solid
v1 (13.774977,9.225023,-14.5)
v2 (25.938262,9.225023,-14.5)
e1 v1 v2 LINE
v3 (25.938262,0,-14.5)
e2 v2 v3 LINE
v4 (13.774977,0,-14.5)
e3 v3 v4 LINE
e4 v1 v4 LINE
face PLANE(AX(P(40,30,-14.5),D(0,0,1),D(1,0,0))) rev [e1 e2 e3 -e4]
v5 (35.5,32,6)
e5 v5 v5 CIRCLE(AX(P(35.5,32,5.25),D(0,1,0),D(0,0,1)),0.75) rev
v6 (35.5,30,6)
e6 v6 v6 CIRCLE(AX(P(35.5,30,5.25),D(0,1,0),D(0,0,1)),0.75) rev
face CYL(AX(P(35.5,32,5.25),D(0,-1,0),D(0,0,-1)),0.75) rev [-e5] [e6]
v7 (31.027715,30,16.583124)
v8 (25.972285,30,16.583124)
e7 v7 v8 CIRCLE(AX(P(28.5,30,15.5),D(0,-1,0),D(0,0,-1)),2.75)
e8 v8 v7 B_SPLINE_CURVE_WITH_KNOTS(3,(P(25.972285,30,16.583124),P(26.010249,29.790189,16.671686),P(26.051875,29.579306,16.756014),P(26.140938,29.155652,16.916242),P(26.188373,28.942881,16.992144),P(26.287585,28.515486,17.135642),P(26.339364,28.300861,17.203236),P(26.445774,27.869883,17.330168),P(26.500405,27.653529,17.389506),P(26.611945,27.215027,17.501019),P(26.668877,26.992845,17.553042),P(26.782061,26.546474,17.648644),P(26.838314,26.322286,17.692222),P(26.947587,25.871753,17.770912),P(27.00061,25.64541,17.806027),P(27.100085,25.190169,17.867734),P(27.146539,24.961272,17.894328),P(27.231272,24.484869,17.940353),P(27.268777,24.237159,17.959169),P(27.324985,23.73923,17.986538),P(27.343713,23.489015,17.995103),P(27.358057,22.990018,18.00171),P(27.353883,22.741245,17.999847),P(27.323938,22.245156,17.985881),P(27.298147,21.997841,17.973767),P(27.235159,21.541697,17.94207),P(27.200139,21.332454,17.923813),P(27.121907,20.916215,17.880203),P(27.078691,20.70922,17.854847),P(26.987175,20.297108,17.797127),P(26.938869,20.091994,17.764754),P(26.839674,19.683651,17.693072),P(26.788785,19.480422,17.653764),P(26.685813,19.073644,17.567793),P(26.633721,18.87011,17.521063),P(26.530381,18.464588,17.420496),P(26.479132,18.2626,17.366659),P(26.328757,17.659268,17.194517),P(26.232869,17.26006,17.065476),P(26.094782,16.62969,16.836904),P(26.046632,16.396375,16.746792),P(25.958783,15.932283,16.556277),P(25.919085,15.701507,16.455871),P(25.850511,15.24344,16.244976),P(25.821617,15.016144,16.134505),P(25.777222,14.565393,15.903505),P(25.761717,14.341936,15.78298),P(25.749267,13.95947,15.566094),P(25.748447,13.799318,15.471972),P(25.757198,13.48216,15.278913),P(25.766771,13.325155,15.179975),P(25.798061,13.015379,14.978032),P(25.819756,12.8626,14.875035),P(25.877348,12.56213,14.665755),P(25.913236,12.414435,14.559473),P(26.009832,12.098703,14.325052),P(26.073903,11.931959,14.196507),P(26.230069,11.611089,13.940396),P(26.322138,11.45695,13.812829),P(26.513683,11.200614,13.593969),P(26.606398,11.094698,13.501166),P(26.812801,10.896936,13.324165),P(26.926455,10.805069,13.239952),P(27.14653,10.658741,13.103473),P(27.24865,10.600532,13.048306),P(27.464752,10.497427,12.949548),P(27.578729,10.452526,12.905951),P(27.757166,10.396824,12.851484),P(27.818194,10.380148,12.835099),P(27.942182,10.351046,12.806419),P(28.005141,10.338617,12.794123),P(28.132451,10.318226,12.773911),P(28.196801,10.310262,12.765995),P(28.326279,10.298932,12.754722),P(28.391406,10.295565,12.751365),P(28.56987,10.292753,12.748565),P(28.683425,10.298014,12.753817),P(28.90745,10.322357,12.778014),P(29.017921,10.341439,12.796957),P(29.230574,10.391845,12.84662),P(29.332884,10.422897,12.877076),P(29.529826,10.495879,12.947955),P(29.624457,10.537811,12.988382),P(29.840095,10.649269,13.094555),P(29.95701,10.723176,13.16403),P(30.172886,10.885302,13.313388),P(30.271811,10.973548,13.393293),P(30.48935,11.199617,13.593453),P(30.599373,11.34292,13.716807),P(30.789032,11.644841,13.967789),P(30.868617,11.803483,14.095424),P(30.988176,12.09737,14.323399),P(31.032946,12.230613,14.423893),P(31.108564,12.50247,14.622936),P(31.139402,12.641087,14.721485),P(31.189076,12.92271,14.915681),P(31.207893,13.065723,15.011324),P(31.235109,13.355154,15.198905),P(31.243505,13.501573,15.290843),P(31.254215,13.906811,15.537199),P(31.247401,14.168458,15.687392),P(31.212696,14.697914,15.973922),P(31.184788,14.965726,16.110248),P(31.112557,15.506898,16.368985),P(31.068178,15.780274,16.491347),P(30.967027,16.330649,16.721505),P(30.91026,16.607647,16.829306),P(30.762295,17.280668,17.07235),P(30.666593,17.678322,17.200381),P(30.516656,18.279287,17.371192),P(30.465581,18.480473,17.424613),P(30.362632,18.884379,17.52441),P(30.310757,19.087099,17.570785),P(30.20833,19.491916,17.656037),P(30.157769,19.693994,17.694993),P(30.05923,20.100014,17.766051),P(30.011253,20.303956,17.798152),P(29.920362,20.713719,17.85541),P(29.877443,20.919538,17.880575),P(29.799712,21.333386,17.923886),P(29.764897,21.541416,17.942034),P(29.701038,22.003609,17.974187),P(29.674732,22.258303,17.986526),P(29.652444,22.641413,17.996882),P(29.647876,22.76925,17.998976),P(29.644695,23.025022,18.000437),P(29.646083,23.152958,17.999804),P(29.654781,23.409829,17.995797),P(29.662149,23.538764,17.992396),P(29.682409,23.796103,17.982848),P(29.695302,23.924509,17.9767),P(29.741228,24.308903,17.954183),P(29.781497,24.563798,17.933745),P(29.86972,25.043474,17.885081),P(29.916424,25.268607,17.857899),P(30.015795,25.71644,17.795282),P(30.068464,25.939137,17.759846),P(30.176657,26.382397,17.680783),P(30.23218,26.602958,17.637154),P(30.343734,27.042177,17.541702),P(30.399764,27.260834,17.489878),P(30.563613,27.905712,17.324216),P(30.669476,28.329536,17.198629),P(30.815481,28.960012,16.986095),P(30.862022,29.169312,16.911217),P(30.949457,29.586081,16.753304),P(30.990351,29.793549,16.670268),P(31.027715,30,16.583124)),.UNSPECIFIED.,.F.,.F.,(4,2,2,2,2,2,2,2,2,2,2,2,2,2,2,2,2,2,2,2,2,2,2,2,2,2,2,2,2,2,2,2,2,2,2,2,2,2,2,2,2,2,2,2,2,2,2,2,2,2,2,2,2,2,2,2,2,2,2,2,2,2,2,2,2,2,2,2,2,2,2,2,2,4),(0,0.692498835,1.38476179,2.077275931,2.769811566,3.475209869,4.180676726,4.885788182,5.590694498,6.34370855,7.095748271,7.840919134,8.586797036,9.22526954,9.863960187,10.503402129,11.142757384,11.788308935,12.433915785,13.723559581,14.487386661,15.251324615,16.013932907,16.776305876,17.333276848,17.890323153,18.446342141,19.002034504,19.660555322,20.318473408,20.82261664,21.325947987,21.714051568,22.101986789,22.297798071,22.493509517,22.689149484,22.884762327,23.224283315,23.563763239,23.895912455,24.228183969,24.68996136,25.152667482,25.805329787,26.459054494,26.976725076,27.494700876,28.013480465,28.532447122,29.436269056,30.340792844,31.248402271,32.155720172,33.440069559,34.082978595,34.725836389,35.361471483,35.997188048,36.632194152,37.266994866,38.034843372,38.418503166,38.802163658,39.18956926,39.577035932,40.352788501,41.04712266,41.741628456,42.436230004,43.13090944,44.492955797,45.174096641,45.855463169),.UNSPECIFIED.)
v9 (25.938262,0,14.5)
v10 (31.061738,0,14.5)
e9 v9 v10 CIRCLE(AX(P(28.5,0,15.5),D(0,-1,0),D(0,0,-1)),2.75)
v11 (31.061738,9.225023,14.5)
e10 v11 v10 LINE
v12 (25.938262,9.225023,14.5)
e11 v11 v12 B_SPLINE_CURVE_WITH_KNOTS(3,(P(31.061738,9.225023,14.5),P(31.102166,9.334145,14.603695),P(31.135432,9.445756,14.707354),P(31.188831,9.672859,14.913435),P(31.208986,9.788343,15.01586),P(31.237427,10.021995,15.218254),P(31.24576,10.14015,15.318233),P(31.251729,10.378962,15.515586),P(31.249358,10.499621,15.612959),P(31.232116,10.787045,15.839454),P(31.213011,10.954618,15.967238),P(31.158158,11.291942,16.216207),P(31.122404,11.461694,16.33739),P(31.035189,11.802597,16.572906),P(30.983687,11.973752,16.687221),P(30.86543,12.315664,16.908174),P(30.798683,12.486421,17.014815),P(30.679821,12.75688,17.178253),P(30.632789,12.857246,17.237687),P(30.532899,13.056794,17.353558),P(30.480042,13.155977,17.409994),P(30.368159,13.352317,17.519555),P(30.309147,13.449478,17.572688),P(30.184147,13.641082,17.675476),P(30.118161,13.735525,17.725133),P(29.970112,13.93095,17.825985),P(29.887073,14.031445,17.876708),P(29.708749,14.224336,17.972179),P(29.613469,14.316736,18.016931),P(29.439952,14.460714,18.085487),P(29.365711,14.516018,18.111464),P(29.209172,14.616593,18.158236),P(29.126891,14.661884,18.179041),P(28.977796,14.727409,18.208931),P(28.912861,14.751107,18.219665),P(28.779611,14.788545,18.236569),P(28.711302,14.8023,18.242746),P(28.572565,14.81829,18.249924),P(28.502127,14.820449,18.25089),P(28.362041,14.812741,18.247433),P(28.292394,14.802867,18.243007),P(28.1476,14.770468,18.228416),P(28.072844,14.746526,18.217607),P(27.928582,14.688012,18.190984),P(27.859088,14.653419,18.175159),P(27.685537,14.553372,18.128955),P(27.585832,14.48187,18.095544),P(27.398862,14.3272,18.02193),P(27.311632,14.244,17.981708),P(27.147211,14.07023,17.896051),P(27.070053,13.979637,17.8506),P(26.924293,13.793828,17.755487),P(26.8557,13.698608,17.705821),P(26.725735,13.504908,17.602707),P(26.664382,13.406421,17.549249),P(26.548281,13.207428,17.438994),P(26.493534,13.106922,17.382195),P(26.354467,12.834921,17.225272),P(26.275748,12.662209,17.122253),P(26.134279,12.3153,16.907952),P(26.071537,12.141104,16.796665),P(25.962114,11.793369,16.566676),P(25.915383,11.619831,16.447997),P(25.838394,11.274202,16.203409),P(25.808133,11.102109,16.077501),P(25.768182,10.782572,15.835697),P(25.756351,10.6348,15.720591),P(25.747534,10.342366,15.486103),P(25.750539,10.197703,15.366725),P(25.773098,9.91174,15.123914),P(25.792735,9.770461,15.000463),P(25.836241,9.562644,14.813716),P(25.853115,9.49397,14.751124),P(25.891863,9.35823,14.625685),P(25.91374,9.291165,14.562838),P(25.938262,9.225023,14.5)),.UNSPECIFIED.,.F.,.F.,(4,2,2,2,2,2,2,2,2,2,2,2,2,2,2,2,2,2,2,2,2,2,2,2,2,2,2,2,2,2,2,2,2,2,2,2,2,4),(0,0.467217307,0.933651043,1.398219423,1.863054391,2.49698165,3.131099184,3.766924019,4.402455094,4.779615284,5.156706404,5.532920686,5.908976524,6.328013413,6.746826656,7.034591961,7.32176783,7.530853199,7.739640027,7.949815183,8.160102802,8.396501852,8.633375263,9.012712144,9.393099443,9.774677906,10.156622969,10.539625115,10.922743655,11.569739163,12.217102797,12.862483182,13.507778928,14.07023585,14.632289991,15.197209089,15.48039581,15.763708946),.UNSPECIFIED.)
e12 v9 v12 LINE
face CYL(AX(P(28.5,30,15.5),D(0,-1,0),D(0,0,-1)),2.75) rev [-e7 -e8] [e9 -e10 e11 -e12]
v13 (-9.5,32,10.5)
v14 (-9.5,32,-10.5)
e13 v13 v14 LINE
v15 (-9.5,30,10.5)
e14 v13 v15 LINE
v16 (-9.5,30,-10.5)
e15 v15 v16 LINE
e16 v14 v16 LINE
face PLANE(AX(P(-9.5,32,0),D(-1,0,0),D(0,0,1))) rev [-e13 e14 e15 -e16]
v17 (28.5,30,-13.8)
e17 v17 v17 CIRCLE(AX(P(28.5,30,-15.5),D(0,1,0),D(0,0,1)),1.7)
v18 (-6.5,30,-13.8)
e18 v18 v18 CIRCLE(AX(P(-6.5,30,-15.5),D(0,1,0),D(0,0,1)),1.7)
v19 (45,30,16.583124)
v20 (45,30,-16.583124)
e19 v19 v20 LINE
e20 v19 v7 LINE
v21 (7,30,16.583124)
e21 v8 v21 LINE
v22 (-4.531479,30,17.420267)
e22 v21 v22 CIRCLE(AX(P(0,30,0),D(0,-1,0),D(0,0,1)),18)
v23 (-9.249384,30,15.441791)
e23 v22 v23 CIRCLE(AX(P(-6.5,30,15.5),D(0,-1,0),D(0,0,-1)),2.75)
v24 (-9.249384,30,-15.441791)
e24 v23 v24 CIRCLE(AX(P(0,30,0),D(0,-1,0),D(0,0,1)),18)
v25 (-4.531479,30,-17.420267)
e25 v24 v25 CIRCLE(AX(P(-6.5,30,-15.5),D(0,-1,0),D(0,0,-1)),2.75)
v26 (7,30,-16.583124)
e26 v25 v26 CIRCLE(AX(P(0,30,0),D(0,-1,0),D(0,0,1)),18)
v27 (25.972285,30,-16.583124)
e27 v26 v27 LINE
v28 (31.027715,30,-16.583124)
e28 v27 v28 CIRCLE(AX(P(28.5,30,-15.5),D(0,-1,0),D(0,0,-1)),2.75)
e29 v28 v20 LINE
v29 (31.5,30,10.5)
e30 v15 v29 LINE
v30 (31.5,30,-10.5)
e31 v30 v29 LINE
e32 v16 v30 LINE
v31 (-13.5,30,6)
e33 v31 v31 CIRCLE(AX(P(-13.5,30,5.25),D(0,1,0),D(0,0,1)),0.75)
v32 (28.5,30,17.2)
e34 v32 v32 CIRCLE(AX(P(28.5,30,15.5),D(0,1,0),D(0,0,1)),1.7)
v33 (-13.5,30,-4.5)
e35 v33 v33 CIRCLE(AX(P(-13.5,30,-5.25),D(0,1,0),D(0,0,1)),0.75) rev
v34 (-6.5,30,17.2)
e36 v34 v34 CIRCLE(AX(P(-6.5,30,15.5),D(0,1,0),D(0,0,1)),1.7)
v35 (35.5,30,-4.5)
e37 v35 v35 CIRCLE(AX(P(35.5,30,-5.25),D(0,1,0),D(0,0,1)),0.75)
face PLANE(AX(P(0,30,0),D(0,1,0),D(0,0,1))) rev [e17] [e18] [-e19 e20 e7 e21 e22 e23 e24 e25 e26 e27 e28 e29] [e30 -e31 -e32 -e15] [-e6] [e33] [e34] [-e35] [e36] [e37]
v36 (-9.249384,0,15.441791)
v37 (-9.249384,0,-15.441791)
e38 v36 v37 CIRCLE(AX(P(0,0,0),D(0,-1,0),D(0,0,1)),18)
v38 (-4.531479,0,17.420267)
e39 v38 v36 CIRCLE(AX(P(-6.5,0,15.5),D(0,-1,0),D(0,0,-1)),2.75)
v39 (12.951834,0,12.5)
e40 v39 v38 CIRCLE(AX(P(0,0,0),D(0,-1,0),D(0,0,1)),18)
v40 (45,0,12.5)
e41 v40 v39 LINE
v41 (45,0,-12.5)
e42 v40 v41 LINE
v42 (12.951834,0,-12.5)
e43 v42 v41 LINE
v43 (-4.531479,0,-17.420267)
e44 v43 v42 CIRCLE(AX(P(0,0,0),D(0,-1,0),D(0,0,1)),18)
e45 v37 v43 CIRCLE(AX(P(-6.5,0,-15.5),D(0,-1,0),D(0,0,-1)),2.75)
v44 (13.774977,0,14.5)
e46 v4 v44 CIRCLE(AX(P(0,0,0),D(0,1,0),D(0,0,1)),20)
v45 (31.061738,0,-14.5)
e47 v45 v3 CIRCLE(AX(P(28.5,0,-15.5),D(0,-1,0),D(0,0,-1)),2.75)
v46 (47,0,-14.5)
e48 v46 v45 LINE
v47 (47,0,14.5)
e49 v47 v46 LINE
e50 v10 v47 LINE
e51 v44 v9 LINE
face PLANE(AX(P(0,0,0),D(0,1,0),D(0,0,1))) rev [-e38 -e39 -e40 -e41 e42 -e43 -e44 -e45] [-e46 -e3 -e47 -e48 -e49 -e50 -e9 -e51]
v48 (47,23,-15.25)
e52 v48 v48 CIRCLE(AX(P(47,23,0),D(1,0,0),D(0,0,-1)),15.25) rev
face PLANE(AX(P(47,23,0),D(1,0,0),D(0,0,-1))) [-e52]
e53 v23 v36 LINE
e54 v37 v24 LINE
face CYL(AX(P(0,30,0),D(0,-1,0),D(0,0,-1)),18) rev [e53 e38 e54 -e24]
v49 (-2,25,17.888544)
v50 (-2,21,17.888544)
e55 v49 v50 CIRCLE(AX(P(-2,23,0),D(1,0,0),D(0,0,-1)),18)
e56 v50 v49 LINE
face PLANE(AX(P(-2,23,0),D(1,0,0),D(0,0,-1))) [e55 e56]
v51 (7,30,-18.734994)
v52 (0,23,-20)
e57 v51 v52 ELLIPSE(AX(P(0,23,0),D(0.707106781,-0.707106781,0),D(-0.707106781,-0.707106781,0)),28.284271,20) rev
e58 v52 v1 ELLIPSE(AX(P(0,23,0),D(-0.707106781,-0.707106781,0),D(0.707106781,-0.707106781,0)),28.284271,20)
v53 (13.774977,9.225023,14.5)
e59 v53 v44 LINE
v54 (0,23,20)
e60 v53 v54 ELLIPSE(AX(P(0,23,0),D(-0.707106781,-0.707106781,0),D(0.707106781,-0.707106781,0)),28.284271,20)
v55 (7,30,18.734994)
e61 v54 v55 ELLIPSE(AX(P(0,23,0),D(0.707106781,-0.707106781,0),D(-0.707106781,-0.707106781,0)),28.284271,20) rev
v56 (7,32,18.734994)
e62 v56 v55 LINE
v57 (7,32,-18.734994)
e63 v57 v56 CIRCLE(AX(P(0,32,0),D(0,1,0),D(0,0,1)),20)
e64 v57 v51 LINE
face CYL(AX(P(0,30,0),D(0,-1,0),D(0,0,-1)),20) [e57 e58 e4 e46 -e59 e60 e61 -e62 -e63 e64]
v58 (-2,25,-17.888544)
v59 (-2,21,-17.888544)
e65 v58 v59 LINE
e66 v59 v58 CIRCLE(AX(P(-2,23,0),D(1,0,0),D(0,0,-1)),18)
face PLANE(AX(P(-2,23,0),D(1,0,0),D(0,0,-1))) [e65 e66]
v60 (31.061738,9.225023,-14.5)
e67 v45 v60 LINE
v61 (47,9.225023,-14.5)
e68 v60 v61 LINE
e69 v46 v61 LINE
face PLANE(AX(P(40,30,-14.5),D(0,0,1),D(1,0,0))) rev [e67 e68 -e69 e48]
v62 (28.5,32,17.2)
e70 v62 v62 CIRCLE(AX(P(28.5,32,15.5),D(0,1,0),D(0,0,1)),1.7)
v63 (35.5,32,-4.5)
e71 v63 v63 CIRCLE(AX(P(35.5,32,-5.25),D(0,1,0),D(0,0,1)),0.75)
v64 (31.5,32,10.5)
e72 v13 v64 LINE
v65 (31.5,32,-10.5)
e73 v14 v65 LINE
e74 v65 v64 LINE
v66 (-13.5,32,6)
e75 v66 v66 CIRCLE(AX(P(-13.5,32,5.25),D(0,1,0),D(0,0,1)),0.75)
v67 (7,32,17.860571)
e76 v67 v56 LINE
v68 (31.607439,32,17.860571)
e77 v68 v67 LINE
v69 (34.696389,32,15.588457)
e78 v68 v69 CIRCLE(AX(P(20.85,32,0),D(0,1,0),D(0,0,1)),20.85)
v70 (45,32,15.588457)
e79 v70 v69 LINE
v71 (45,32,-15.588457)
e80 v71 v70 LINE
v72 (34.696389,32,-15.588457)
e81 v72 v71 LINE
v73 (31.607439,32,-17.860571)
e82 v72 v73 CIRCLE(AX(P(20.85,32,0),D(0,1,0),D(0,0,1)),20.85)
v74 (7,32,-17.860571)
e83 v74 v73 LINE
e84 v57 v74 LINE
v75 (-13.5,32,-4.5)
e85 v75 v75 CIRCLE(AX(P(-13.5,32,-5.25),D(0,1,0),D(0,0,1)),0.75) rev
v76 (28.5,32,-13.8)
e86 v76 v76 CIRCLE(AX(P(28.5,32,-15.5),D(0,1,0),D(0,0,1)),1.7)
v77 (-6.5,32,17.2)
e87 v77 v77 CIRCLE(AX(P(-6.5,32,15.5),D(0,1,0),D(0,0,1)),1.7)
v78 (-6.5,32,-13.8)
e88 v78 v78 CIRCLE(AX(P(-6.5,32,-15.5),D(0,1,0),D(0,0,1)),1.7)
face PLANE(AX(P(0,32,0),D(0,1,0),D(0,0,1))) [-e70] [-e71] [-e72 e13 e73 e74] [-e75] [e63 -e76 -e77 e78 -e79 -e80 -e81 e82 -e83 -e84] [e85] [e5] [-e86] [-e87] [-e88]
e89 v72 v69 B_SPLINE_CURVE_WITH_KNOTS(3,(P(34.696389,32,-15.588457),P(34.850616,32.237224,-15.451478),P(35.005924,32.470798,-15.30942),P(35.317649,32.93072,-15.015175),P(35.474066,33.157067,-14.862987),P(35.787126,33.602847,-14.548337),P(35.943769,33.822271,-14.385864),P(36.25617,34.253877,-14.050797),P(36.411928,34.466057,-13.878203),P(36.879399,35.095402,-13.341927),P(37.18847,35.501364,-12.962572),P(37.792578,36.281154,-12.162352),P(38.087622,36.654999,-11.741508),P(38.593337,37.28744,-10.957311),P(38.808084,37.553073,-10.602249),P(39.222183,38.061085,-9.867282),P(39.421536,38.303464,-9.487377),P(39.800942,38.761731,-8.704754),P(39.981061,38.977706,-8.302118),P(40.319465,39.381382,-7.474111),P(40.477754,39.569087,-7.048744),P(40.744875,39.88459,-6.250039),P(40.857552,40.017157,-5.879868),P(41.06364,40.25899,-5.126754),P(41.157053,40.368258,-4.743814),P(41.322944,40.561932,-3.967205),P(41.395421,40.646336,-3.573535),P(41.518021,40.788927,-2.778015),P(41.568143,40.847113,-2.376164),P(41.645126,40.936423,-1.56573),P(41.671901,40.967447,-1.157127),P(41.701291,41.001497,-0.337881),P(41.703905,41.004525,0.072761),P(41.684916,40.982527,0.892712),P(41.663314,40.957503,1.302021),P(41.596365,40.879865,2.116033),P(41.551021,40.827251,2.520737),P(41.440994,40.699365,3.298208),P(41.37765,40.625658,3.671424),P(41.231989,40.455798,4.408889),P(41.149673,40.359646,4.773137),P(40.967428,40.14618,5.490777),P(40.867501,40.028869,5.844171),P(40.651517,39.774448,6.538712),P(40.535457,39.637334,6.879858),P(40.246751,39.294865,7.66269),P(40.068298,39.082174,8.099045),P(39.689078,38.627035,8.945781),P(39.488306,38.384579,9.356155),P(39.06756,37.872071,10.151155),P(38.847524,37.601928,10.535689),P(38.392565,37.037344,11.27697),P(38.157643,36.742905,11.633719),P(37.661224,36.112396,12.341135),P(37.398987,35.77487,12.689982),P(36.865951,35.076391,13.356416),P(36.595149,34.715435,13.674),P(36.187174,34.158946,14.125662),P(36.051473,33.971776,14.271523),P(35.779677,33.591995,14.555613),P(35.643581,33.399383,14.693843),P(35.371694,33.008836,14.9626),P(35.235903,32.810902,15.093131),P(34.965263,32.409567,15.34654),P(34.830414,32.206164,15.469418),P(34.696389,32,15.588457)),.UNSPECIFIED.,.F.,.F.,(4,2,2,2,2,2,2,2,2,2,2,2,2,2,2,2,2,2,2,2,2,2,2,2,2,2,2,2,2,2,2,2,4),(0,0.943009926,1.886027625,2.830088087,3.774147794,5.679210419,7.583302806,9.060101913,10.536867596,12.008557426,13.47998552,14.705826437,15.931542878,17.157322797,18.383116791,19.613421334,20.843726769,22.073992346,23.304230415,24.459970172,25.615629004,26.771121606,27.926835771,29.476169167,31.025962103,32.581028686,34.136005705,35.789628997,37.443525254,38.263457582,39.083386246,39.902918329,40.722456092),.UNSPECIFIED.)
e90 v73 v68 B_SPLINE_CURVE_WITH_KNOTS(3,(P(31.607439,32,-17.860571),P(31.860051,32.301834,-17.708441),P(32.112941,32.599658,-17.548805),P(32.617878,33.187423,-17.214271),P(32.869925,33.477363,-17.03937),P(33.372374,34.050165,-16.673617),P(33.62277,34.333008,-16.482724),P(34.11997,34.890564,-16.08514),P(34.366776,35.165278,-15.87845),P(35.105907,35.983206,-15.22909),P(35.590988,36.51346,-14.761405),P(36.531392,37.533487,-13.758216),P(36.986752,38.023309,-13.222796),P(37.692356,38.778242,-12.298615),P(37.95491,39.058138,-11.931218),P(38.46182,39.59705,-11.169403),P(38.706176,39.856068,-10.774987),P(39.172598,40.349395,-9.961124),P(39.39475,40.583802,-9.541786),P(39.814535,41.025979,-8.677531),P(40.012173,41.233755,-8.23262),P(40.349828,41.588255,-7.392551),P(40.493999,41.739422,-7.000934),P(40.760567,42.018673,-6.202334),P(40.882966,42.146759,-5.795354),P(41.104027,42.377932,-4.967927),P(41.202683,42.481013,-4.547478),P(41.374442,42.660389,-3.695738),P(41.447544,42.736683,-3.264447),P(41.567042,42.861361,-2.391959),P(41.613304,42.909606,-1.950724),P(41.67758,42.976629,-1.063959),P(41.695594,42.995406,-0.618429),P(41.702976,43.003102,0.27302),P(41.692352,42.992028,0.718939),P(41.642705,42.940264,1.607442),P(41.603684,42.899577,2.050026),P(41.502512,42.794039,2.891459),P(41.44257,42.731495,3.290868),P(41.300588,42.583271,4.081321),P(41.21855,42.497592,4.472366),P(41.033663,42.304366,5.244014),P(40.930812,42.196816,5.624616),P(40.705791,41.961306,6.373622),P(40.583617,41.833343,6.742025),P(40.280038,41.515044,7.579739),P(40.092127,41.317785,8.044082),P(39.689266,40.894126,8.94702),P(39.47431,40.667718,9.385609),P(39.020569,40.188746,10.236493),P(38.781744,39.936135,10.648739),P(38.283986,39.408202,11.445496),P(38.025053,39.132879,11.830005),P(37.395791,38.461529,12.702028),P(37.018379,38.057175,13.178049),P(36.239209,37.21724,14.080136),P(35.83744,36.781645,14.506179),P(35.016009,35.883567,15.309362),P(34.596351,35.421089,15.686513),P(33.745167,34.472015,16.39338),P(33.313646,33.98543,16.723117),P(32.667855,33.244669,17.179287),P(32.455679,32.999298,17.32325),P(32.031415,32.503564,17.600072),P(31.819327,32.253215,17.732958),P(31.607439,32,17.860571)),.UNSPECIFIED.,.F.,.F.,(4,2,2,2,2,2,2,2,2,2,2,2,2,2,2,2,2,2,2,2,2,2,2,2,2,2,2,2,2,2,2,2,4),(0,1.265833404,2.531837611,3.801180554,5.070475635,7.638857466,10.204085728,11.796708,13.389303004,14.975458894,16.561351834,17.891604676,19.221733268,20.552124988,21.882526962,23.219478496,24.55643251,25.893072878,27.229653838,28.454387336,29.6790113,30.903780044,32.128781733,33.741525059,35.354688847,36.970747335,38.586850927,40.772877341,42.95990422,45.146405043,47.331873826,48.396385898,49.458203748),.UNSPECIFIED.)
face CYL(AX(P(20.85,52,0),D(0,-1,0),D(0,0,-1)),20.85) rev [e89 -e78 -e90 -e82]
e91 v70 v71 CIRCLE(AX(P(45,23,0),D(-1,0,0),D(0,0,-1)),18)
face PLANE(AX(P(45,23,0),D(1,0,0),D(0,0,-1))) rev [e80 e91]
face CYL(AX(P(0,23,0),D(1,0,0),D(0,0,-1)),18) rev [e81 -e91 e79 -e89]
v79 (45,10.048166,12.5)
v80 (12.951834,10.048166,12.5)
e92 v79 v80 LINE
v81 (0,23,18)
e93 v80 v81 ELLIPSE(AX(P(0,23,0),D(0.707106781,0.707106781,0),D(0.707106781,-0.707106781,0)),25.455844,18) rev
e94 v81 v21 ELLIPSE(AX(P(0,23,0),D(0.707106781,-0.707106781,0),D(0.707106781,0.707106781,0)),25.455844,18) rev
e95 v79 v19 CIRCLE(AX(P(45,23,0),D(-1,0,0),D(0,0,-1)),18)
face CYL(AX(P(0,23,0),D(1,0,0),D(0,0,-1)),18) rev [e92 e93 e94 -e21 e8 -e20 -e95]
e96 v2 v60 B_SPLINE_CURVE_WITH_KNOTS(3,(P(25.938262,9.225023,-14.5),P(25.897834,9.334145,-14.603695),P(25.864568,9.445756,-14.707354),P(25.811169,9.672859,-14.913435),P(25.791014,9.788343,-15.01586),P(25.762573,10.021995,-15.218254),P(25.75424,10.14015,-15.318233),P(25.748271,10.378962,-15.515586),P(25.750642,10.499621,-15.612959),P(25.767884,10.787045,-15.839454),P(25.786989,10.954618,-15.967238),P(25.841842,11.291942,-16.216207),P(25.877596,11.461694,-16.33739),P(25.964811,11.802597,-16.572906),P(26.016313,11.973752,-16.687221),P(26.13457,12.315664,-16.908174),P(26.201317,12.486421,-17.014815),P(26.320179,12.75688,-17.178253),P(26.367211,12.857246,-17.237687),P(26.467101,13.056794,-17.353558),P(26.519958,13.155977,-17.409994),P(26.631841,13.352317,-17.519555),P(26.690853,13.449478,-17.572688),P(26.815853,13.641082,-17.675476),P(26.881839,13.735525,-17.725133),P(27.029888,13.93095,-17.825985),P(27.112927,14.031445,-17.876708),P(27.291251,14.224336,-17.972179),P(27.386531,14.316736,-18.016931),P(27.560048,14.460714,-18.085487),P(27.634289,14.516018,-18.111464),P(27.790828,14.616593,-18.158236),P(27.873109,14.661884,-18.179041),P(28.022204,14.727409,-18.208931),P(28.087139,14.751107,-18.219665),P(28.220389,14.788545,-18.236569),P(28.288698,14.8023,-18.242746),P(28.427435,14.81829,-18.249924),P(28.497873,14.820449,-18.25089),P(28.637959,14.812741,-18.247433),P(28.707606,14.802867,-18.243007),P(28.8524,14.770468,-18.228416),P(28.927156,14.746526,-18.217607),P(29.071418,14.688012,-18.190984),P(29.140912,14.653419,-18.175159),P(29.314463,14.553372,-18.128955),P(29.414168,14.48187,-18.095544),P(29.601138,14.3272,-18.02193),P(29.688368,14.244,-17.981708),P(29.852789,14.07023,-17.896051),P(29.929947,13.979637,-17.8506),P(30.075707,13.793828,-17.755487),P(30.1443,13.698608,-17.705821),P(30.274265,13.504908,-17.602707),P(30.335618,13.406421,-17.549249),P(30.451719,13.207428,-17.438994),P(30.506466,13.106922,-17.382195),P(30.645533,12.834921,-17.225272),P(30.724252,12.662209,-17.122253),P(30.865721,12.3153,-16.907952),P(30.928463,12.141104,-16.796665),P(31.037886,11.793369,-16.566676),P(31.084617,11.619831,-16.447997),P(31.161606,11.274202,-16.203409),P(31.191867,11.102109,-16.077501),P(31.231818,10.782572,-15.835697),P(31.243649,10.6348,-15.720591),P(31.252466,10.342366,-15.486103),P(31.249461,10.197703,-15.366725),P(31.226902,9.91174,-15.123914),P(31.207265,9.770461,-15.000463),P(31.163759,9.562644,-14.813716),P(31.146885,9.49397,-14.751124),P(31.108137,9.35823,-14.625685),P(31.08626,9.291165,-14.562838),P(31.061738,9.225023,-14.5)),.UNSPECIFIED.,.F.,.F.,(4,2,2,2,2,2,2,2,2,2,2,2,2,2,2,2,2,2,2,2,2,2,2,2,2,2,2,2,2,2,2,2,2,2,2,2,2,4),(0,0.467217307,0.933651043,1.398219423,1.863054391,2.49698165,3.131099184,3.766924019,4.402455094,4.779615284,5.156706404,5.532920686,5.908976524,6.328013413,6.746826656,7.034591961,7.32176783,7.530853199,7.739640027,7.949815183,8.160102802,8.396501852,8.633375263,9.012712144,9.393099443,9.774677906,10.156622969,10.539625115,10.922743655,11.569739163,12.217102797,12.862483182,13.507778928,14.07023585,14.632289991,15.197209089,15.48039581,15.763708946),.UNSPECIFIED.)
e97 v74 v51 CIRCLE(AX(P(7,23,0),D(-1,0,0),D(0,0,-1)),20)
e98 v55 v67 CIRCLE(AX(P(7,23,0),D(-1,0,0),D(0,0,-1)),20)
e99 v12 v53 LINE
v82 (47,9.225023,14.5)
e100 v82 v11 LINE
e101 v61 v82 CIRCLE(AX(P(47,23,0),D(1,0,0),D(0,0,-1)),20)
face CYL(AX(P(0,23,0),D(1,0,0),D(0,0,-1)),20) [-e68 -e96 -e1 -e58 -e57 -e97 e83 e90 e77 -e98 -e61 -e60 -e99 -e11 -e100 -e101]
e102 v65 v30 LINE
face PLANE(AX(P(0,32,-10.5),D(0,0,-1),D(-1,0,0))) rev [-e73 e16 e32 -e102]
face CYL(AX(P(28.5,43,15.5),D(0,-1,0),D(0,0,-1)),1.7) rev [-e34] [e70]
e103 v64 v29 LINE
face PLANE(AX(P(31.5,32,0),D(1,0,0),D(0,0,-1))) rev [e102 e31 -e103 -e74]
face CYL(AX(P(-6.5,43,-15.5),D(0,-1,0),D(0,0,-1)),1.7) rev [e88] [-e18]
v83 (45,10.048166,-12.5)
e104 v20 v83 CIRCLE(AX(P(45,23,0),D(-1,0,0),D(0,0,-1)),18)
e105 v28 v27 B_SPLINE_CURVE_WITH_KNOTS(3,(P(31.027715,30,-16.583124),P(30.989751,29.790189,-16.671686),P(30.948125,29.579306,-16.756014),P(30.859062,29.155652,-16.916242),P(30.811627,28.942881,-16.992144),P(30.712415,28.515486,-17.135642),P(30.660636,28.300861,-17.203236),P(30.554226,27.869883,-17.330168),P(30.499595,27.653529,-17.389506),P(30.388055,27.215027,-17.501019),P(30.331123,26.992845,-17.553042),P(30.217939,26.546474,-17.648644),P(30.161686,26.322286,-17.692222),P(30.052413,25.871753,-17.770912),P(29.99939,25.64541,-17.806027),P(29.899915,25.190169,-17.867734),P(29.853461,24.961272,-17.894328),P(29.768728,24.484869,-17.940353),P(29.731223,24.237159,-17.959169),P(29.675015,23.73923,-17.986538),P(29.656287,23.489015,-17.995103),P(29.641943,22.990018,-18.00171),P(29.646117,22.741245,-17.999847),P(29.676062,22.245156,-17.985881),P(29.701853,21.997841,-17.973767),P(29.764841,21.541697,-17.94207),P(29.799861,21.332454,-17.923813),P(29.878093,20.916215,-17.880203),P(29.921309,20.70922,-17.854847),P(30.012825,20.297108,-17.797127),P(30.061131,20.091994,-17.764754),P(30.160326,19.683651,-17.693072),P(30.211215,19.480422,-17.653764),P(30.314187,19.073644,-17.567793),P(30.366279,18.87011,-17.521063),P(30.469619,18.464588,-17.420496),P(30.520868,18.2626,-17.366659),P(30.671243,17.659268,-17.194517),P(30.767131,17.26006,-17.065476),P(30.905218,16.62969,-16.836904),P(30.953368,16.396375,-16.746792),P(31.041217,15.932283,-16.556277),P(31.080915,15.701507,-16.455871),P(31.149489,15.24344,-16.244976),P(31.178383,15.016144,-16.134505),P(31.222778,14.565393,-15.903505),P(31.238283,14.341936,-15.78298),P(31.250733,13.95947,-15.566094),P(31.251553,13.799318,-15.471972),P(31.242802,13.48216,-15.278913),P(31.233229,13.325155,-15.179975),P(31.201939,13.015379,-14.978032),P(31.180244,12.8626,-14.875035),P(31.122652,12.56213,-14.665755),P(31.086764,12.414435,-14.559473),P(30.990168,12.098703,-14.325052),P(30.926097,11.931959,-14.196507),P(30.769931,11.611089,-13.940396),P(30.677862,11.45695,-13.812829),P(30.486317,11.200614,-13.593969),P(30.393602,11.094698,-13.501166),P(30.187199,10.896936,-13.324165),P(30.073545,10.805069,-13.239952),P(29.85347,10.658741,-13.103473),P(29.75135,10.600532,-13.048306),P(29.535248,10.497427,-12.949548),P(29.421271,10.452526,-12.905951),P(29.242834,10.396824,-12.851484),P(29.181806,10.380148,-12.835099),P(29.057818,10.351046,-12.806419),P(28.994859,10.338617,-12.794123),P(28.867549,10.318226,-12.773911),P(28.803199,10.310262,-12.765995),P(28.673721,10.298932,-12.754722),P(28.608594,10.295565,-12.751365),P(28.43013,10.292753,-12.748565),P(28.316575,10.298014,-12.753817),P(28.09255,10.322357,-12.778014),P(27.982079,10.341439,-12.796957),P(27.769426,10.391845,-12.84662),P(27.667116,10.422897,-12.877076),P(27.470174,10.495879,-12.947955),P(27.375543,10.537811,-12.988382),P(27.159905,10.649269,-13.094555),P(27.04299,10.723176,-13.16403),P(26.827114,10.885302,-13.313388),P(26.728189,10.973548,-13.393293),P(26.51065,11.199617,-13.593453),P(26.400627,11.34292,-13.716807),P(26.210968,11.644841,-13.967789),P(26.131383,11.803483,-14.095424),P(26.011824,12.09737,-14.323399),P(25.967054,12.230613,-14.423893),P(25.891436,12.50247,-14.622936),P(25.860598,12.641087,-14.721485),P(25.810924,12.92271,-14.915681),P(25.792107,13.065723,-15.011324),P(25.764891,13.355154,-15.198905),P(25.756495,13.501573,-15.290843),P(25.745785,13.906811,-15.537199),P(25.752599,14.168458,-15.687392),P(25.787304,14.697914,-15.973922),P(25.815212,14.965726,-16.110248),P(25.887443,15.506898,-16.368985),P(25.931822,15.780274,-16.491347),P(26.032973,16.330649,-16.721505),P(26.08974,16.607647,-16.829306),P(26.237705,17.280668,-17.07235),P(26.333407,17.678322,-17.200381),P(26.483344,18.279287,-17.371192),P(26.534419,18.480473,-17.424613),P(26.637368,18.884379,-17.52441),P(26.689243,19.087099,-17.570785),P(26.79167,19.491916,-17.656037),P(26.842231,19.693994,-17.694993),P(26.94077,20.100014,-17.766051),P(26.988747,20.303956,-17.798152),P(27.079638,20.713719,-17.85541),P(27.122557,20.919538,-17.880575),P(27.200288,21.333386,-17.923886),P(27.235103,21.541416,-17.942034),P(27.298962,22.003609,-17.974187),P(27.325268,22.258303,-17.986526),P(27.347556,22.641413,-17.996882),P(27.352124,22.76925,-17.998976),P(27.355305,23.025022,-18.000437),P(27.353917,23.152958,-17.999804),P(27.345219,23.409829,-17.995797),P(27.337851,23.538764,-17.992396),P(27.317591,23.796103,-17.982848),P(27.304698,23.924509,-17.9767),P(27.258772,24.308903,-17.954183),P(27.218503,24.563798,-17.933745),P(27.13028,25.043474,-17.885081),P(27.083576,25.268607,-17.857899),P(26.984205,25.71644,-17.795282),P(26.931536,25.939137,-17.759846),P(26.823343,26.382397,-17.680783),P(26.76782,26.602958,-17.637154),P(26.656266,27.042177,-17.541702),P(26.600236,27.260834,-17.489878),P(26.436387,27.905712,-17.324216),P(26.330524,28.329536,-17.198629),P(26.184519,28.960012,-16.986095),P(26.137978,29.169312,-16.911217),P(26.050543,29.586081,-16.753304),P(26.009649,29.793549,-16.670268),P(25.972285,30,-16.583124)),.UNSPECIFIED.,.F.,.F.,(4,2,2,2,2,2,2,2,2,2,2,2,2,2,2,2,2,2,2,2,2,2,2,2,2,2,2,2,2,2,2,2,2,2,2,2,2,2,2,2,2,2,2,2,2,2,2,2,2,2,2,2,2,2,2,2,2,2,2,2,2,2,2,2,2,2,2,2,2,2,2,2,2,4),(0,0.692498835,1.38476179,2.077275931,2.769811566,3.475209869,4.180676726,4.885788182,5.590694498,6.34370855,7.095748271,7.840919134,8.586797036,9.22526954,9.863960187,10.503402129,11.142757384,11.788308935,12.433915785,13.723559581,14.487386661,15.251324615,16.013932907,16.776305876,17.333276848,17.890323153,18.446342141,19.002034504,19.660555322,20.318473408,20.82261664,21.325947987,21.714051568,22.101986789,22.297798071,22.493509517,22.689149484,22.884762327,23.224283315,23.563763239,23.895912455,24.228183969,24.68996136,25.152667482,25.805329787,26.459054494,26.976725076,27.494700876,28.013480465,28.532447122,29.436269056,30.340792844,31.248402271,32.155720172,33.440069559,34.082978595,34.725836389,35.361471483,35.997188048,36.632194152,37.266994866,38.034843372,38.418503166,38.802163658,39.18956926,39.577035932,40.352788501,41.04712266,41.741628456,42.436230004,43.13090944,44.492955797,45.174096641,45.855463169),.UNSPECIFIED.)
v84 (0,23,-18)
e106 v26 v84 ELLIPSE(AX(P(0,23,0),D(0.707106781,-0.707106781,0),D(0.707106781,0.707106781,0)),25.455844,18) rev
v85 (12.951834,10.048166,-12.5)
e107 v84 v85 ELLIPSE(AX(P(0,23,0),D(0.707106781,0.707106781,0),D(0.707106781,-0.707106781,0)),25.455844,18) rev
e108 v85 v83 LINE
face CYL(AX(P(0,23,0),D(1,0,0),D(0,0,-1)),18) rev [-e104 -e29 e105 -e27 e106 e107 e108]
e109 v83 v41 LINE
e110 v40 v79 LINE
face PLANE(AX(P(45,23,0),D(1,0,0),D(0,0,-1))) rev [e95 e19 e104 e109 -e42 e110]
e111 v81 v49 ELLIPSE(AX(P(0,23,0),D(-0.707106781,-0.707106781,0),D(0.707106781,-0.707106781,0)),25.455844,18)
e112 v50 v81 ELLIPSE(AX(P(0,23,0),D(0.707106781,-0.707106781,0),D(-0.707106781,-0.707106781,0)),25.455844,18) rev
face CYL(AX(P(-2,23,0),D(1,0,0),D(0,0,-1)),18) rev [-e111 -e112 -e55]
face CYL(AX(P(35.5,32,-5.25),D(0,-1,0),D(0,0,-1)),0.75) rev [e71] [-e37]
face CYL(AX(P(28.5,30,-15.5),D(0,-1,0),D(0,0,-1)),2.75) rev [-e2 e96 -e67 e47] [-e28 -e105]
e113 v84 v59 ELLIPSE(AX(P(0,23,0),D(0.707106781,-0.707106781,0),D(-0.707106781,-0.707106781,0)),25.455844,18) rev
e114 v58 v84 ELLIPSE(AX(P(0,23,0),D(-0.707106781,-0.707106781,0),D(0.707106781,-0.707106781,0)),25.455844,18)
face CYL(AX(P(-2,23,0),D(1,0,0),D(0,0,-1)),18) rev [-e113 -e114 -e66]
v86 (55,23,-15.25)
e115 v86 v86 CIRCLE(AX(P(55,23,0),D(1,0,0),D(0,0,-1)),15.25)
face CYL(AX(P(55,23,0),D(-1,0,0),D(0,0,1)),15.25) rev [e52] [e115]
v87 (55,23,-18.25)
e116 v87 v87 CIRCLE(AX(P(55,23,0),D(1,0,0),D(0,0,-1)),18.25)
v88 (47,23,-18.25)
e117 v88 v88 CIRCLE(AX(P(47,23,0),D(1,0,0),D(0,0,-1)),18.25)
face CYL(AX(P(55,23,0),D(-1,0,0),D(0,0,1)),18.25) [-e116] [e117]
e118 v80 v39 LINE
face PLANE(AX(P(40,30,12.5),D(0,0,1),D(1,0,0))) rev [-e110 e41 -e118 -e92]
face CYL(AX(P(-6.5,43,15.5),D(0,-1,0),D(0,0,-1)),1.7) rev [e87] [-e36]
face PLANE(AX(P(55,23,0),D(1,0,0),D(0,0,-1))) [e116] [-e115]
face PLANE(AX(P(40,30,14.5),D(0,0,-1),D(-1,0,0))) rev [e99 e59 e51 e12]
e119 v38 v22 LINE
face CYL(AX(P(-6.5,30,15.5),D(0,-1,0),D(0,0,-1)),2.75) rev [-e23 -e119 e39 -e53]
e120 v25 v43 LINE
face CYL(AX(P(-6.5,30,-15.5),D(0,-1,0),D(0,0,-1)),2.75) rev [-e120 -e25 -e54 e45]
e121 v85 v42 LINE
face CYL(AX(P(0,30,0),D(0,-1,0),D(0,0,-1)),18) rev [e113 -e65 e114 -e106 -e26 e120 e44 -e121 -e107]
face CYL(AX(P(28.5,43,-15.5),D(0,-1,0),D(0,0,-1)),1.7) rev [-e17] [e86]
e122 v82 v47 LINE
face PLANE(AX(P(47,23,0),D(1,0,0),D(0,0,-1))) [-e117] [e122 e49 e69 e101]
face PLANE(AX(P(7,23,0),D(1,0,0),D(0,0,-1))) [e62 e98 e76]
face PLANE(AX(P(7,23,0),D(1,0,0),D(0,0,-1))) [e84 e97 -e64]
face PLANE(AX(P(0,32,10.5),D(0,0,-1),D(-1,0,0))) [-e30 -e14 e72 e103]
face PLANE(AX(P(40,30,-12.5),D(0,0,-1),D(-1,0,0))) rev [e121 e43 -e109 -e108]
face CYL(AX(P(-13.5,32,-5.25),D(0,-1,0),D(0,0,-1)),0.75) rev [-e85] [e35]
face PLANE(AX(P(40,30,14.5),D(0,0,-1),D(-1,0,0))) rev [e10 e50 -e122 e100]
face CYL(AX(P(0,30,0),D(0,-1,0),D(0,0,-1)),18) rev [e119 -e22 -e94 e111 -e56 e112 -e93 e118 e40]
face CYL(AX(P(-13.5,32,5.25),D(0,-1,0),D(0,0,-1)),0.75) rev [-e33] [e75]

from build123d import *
from build123d.topology import SkipClean

# Parameters (mm, degrees)
EXTRUDE_1_DEPTH      = 30
EXTRUDE_START        = -40
EXTRUDE_5_DEPTH      = 40
CUT_EXTRUDE_START    = -42
SKETCH_11_R          = 18
CUT_EXTRUDE_2_DEPTH  = 42
CUT_EXTRUDE_3_DEPTH  = 20
CUT_EXTRUDE_6_DEPTH  = 30
EXTRUDE_7_DEPTH      = 5
EXTRUDE_7_DEPTH_BACK = 10
SKETCH_14_R          = 0.75
SKETCH_14_W          = 41
SKETCH_14_H          = 21
EXTRUDE_9_DEPTH      = 2
SKETCH_18_R          = 20.85
CUT_EXTRUDE_8_DEPTH  = 20
CUT_EXTRUDE_START_2  = -38
CUT_EXTRUDE_10_DEPTH = 38
EXTRUDE_10_DEPTH     = 5
EXTRUDE_11_DEPTH     = 2
SKETCH_22_R          = 18.25
SKETCH_22_R_2        = 15.25
EXTRUDE_13_DEPTH     = 8
SKETCH_29_R          = 1.7
CUT_EXTRUDE_13_DEPTH = 73.622310708
SKETCH_30_R          = 2.75
CUT_EXTRUDE_14_DEPTH = 30


# Read off the part's stored shape, not the designer's step: 凸台-拉伸5
with BuildPart() as part:
    # 草图1 → 凸台-拉伸1 (new body)
    with BuildSketch(Plane(origin=(0, 0, 0), x_dir=(1, 0, 0), z_dir=(0, 1, 0))):
        with BuildLine():
            Line((40, 12.5), (12.951833847, 12.5))
            ThreePointArc((12.951833847, 12.5), (-18, 0), (12.951833847, -12.5))
            Line((12.951833847, -12.5), (40, -12.5))
            Line((40, -12.5), (40, -14.5))
            Line((40, -14.5), (13.774977314, -14.5))
            ThreePointArc((13.774977314, -14.5), (-20, 0), (13.774977314, 14.5))
            Line((13.774977314, 14.5), (40, 14.5))
            Line((40, 14.5), (40, 12.5))
        make_face()
    extrude(amount=EXTRUDE_1_DEPTH)

    # 凸台-拉伸5 outline → 凸台-拉伸5 (add)
    with BuildSketch(Plane(origin=(40, 0, 0), x_dir=(0, 0, -1), z_dir=(1, 0, 0)).offset(EXTRUDE_START)):
        with BuildLine():
            ThreePointArc((14.5, 9.225022686), (0, 43), (-14.5, 9.225022686))
            ThreePointArc((-14.5, 9.225022686), (0, 3), (14.5, 9.225022686))
        make_face()
        with BuildLine():
            ThreePointArc((14.5, 12.334635496), (0, 5), (-14.5, 12.334635496))
            ThreePointArc((-14.5, 12.334635496), (0, 41), (14.5, 12.334635496))
        make_face(mode=Mode.SUBTRACT)
    extrude(amount=EXTRUDE_5_DEPTH)

    # 草图11 → 切除-拉伸2 (cut)
    with BuildSketch(Plane(origin=(40, 0, 0), x_dir=(0, 0, -1), z_dir=(1, 0, 0)).offset(CUT_EXTRUDE_START)):
        with Locations((0, 23)):
            Circle(SKETCH_11_R)
    extrude(amount=CUT_EXTRUDE_2_DEPTH, mode=Mode.SUBTRACT)

    # 草图10 → 切除-拉伸3 (cut)
    with BuildSketch(Plane(origin=(0, 30, 0), x_dir=(1, 0, 0), z_dir=(0, 1, 0))):
        with BuildLine():
            Line((0, 20), (40, 20))
            Line((40, 20), (40, -20))
            Line((40, -20), (0, -20))
            ThreePointArc((0, -20), (-20, 0), (0, 20))
        make_face()
    extrude(amount=CUT_EXTRUDE_3_DEPTH, mode=Mode.SUBTRACT)

    # 草图13 → 切除-拉伸6 (cut)
    with SkipClean():  # the faces are left unmerged after this step: merging them gives an invalid solid
        with BuildSketch(Plane.XZ):
            with BuildLine():
                Line((40, -12.5), (12.951833847, -12.5))
                ThreePointArc((12.951833847, -12.5), (-18, 0), (12.951833847, 12.5))
                Line((12.951833847, 12.5), (40, 12.5))
                Line((40, 12.5), (40, -12.5))
            make_face()
        extrude(amount=-CUT_EXTRUDE_6_DEPTH, mode=Mode.SUBTRACT)

    # 草图15 → 凸台-拉伸7 (add, two sides: drawn at the far end of the back side and taken through both)
    with SkipClean():  # the faces are left unmerged after this step: merging them gives an invalid solid
        with BuildSketch(Plane(origin=(40, 0, 0), x_dir=(0, 0, -1), z_dir=(1, 0, 0)).offset(-EXTRUDE_7_DEPTH_BACK)):
            with BuildLine():
                Line((12.5, 10.048166153), (12.5, 7.387505004))
                ThreePointArc((12.5, 7.387505004), (0, 43), (-12.5, 7.387505004))
                Line((-12.5, 7.387505004), (-12.5, 10.048166153))
                ThreePointArc((-12.5, 10.048166153), (0, 41), (12.5, 10.048166153))
            make_face()
        extrude(amount=EXTRUDE_7_DEPTH + EXTRUDE_7_DEPTH_BACK)

    # 草图14 → 凸台-拉伸9 (add)
    # profile 1 of 2: a face of its own
    with SkipClean():  # the faces are left unmerged after this step: merging them gives an invalid solid
        with BuildSketch(Plane(origin=(0, 30, 0), x_dir=(1, 0, 0), z_dir=(0, 1, 0))):
            with BuildLine():
                Line((7, -18.734993995), (30, -18.734993995))
                Line((30, -18.734993995), (30, -16.583123952))
                Line((30, -16.583123952), (7, -16.583123952))
                ThreePointArc((7, -16.583123952), (-18, 0), (7, 16.583123952))
                Line((7, 16.583123952), (30, 16.583123952))
                Line((30, 16.583123952), (30, 18.734993995))
                Line((30, 18.734993995), (7, 18.734993995))
                ThreePointArc((7, 18.734993995), (-20, 0), (7, -18.734993995))
            make_face()
        # profile 2 of 2: a face of its own
        with BuildSketch(Plane(origin=(0, 30, 0), x_dir=(1, 0, 0), z_dir=(0, 1, 0))):
            with BuildLine():
                Line((40, 16.583123952), (40, -16.583123952))
                Line((40, -16.583123952), (7, -16.583123952))
                ThreePointArc((7, -16.583123952), (-18, 0), (7, 16.583123952))
                Line((7, 16.583123952), (40, 16.583123952))
            make_face()
            with Locations(Location((-13.5, 5.25, 0), (0, 0, 270))):
                Circle(SKETCH_14_R, mode=Mode.SUBTRACT)
            with Locations(Location((-13.5, -5.25, 0), (0, 0, 270))):
                Circle(SKETCH_14_R, mode=Mode.SUBTRACT)
            with Locations(Location((35.5, 5.25, 0), (0, 0, 270))):
                Circle(SKETCH_14_R, mode=Mode.SUBTRACT)
            with Locations(Location((35.5, -5.25, 0), (0, 0, 270))):
                Circle(SKETCH_14_R, mode=Mode.SUBTRACT)
            with Locations((11, 0)):
                Rectangle(SKETCH_14_W, SKETCH_14_H, mode=Mode.SUBTRACT)
        extrude(amount=EXTRUDE_9_DEPTH)

    # 草图18 → 切除-拉伸8 (cut)
    with SkipClean():  # the faces are left unmerged after this step: merging them gives an invalid solid
        with BuildSketch(Plane(origin=(0, 32, 0), x_dir=(1, 0, 0), z_dir=(0, 1, 0))):
            with Locations((20.85, 0)):
                Circle(SKETCH_18_R)
        extrude(amount=CUT_EXTRUDE_8_DEPTH, mode=Mode.SUBTRACT)

    # 草图19 → 切除-拉伸10 (cut)
    with SkipClean():  # the faces are left unmerged after this step: merging them gives an invalid solid
        with BuildSketch(Plane(origin=(45, 0, 0), x_dir=(0, 0, -1), z_dir=(1, 0, 0)).offset(CUT_EXTRUDE_START_2)):
            with BuildLine():
                Line((-17.860571099, 32), (-18.734993995, 32))
                Line((-18.734993995, 32), (-18.734993995, 30))
                ThreePointArc((-18.734993995, 30), (-18.325087889, 31.011938208), (-17.860571099, 32))
            make_face()
            with BuildLine():
                Line((18.734993995, 32), (17.860571099, 32))
                ThreePointArc((17.860571099, 32), (18.325087889, 31.011938208), (18.734993995, 30))
                Line((18.734993995, 30), (18.734993995, 32))
            make_face()
        extrude(amount=CUT_EXTRUDE_10_DEPTH, mode=Mode.SUBTRACT)

    # 草图20 → 凸台-拉伸10 (add)
    with SkipClean():  # the faces are left unmerged after this step: merging them gives an invalid solid
        with BuildSketch(Plane(origin=(40, 0, 0), x_dir=(0, 0, -1), z_dir=(1, 0, 0))):
            with BuildLine():
                Line((-14.5, 9.225022686), (-14.5, 0))
                Line((-14.5, 0), (-12.5, 0))
                Line((-12.5, 0), (-12.5, 7.387505004))
                ThreePointArc((-12.5, 7.387505004), (-13.531227506, 8.27227505), (-14.5, 9.225022686))
            make_face()
            with BuildLine():
                Line((12.5, 7.387505004), (12.5, 0))
                Line((12.5, 0), (14.5, 0))
                Line((14.5, 0), (14.5, 9.225022686))
                ThreePointArc((14.5, 9.225022686), (13.531227506, 8.27227505), (12.5, 7.387505004))
            make_face()
            with BuildLine():
                Line((-16.583123952, 30), (16.583123952, 30))
                ThreePointArc((16.583123952, 30), (16.11684397, 31.015443871), (15.588457268, 32))
                Line((15.588457268, 32), (-15.588457268, 32))
                ThreePointArc((-15.588457268, 32), (-16.11684397, 31.015443871), (-16.583123952, 30))
            make_face()
        extrude(amount=EXTRUDE_10_DEPTH)

    # 草图21 → 凸台-拉伸11 (add)
    with SkipClean():  # the faces are left unmerged after this step: merging them gives an invalid solid
        with BuildSketch(Plane(origin=(45, 0, 0), x_dir=(0, 0, -1), z_dir=(1, 0, 0))):
            with BuildLine():
                Line((-14.5, 0), (14.5, 0))
                Line((14.5, 0), (14.5, 9.225022686))
                ThreePointArc((14.5, 9.225022686), (0, 43), (-14.5, 9.225022686))
                Line((-14.5, 9.225022686), (-14.5, 0))
            make_face()
        extrude(amount=EXTRUDE_11_DEPTH)

    # 草图22 → 凸台-拉伸13 (add)
    with SkipClean():  # the faces are left unmerged after this step: merging them gives an invalid solid
        with BuildSketch(Plane(origin=(47, 0, 0), x_dir=(0, 0, -1), z_dir=(1, 0, 0))):
            with Locations((0, 23)):
                Circle(SKETCH_22_R)
            with Locations((0, 23)):
                Circle(SKETCH_22_R_2, mode=Mode.SUBTRACT)
        extrude(amount=EXTRUDE_13_DEPTH)

    # 草图29 → 切除-拉伸13 (cut, through all)
    with SkipClean():  # the faces are left unmerged after this step: merging them gives an invalid solid
        with BuildSketch(Plane.XZ):
            with Locations(Location((-6.5, -15.5, 0), (0, 0, 90))):
                Circle(SKETCH_29_R)
            with Locations(Location((28.5, -15.5, 0), (0, 0, 90))):
                Circle(SKETCH_29_R)
            with Locations(Location((28.5, 15.5, 0), (0, 0, 90))):
                Circle(SKETCH_29_R)
            with Locations(Location((-6.5, 15.5, 0), (0, 0, 90))):
                Circle(SKETCH_29_R)
        extrude(amount=-CUT_EXTRUDE_13_DEPTH, mode=Mode.SUBTRACT)

    # 草图30 → 切除-拉伸14 (cut)
    with SkipClean():  # the faces are left unmerged after this step: merging them gives an invalid solid
        with BuildSketch(Plane.XZ):
            with Locations((-6.5, -15.5)):
                Circle(SKETCH_30_R)
            with Locations(Location((28.5, -15.5, 0), (0, 0, 203.195097041))):
                Circle(SKETCH_30_R)
            with Locations(Location((28.5, 15.5, 0), (0, 0, 338.676313737))):
                Circle(SKETCH_30_R)
            with Locations((-6.5, 15.5)):
                Circle(SKETCH_30_R)
        extrude(amount=-CUT_EXTRUDE_14_DEPTH, mode=Mode.SUBTRACT)


solid = part.part
